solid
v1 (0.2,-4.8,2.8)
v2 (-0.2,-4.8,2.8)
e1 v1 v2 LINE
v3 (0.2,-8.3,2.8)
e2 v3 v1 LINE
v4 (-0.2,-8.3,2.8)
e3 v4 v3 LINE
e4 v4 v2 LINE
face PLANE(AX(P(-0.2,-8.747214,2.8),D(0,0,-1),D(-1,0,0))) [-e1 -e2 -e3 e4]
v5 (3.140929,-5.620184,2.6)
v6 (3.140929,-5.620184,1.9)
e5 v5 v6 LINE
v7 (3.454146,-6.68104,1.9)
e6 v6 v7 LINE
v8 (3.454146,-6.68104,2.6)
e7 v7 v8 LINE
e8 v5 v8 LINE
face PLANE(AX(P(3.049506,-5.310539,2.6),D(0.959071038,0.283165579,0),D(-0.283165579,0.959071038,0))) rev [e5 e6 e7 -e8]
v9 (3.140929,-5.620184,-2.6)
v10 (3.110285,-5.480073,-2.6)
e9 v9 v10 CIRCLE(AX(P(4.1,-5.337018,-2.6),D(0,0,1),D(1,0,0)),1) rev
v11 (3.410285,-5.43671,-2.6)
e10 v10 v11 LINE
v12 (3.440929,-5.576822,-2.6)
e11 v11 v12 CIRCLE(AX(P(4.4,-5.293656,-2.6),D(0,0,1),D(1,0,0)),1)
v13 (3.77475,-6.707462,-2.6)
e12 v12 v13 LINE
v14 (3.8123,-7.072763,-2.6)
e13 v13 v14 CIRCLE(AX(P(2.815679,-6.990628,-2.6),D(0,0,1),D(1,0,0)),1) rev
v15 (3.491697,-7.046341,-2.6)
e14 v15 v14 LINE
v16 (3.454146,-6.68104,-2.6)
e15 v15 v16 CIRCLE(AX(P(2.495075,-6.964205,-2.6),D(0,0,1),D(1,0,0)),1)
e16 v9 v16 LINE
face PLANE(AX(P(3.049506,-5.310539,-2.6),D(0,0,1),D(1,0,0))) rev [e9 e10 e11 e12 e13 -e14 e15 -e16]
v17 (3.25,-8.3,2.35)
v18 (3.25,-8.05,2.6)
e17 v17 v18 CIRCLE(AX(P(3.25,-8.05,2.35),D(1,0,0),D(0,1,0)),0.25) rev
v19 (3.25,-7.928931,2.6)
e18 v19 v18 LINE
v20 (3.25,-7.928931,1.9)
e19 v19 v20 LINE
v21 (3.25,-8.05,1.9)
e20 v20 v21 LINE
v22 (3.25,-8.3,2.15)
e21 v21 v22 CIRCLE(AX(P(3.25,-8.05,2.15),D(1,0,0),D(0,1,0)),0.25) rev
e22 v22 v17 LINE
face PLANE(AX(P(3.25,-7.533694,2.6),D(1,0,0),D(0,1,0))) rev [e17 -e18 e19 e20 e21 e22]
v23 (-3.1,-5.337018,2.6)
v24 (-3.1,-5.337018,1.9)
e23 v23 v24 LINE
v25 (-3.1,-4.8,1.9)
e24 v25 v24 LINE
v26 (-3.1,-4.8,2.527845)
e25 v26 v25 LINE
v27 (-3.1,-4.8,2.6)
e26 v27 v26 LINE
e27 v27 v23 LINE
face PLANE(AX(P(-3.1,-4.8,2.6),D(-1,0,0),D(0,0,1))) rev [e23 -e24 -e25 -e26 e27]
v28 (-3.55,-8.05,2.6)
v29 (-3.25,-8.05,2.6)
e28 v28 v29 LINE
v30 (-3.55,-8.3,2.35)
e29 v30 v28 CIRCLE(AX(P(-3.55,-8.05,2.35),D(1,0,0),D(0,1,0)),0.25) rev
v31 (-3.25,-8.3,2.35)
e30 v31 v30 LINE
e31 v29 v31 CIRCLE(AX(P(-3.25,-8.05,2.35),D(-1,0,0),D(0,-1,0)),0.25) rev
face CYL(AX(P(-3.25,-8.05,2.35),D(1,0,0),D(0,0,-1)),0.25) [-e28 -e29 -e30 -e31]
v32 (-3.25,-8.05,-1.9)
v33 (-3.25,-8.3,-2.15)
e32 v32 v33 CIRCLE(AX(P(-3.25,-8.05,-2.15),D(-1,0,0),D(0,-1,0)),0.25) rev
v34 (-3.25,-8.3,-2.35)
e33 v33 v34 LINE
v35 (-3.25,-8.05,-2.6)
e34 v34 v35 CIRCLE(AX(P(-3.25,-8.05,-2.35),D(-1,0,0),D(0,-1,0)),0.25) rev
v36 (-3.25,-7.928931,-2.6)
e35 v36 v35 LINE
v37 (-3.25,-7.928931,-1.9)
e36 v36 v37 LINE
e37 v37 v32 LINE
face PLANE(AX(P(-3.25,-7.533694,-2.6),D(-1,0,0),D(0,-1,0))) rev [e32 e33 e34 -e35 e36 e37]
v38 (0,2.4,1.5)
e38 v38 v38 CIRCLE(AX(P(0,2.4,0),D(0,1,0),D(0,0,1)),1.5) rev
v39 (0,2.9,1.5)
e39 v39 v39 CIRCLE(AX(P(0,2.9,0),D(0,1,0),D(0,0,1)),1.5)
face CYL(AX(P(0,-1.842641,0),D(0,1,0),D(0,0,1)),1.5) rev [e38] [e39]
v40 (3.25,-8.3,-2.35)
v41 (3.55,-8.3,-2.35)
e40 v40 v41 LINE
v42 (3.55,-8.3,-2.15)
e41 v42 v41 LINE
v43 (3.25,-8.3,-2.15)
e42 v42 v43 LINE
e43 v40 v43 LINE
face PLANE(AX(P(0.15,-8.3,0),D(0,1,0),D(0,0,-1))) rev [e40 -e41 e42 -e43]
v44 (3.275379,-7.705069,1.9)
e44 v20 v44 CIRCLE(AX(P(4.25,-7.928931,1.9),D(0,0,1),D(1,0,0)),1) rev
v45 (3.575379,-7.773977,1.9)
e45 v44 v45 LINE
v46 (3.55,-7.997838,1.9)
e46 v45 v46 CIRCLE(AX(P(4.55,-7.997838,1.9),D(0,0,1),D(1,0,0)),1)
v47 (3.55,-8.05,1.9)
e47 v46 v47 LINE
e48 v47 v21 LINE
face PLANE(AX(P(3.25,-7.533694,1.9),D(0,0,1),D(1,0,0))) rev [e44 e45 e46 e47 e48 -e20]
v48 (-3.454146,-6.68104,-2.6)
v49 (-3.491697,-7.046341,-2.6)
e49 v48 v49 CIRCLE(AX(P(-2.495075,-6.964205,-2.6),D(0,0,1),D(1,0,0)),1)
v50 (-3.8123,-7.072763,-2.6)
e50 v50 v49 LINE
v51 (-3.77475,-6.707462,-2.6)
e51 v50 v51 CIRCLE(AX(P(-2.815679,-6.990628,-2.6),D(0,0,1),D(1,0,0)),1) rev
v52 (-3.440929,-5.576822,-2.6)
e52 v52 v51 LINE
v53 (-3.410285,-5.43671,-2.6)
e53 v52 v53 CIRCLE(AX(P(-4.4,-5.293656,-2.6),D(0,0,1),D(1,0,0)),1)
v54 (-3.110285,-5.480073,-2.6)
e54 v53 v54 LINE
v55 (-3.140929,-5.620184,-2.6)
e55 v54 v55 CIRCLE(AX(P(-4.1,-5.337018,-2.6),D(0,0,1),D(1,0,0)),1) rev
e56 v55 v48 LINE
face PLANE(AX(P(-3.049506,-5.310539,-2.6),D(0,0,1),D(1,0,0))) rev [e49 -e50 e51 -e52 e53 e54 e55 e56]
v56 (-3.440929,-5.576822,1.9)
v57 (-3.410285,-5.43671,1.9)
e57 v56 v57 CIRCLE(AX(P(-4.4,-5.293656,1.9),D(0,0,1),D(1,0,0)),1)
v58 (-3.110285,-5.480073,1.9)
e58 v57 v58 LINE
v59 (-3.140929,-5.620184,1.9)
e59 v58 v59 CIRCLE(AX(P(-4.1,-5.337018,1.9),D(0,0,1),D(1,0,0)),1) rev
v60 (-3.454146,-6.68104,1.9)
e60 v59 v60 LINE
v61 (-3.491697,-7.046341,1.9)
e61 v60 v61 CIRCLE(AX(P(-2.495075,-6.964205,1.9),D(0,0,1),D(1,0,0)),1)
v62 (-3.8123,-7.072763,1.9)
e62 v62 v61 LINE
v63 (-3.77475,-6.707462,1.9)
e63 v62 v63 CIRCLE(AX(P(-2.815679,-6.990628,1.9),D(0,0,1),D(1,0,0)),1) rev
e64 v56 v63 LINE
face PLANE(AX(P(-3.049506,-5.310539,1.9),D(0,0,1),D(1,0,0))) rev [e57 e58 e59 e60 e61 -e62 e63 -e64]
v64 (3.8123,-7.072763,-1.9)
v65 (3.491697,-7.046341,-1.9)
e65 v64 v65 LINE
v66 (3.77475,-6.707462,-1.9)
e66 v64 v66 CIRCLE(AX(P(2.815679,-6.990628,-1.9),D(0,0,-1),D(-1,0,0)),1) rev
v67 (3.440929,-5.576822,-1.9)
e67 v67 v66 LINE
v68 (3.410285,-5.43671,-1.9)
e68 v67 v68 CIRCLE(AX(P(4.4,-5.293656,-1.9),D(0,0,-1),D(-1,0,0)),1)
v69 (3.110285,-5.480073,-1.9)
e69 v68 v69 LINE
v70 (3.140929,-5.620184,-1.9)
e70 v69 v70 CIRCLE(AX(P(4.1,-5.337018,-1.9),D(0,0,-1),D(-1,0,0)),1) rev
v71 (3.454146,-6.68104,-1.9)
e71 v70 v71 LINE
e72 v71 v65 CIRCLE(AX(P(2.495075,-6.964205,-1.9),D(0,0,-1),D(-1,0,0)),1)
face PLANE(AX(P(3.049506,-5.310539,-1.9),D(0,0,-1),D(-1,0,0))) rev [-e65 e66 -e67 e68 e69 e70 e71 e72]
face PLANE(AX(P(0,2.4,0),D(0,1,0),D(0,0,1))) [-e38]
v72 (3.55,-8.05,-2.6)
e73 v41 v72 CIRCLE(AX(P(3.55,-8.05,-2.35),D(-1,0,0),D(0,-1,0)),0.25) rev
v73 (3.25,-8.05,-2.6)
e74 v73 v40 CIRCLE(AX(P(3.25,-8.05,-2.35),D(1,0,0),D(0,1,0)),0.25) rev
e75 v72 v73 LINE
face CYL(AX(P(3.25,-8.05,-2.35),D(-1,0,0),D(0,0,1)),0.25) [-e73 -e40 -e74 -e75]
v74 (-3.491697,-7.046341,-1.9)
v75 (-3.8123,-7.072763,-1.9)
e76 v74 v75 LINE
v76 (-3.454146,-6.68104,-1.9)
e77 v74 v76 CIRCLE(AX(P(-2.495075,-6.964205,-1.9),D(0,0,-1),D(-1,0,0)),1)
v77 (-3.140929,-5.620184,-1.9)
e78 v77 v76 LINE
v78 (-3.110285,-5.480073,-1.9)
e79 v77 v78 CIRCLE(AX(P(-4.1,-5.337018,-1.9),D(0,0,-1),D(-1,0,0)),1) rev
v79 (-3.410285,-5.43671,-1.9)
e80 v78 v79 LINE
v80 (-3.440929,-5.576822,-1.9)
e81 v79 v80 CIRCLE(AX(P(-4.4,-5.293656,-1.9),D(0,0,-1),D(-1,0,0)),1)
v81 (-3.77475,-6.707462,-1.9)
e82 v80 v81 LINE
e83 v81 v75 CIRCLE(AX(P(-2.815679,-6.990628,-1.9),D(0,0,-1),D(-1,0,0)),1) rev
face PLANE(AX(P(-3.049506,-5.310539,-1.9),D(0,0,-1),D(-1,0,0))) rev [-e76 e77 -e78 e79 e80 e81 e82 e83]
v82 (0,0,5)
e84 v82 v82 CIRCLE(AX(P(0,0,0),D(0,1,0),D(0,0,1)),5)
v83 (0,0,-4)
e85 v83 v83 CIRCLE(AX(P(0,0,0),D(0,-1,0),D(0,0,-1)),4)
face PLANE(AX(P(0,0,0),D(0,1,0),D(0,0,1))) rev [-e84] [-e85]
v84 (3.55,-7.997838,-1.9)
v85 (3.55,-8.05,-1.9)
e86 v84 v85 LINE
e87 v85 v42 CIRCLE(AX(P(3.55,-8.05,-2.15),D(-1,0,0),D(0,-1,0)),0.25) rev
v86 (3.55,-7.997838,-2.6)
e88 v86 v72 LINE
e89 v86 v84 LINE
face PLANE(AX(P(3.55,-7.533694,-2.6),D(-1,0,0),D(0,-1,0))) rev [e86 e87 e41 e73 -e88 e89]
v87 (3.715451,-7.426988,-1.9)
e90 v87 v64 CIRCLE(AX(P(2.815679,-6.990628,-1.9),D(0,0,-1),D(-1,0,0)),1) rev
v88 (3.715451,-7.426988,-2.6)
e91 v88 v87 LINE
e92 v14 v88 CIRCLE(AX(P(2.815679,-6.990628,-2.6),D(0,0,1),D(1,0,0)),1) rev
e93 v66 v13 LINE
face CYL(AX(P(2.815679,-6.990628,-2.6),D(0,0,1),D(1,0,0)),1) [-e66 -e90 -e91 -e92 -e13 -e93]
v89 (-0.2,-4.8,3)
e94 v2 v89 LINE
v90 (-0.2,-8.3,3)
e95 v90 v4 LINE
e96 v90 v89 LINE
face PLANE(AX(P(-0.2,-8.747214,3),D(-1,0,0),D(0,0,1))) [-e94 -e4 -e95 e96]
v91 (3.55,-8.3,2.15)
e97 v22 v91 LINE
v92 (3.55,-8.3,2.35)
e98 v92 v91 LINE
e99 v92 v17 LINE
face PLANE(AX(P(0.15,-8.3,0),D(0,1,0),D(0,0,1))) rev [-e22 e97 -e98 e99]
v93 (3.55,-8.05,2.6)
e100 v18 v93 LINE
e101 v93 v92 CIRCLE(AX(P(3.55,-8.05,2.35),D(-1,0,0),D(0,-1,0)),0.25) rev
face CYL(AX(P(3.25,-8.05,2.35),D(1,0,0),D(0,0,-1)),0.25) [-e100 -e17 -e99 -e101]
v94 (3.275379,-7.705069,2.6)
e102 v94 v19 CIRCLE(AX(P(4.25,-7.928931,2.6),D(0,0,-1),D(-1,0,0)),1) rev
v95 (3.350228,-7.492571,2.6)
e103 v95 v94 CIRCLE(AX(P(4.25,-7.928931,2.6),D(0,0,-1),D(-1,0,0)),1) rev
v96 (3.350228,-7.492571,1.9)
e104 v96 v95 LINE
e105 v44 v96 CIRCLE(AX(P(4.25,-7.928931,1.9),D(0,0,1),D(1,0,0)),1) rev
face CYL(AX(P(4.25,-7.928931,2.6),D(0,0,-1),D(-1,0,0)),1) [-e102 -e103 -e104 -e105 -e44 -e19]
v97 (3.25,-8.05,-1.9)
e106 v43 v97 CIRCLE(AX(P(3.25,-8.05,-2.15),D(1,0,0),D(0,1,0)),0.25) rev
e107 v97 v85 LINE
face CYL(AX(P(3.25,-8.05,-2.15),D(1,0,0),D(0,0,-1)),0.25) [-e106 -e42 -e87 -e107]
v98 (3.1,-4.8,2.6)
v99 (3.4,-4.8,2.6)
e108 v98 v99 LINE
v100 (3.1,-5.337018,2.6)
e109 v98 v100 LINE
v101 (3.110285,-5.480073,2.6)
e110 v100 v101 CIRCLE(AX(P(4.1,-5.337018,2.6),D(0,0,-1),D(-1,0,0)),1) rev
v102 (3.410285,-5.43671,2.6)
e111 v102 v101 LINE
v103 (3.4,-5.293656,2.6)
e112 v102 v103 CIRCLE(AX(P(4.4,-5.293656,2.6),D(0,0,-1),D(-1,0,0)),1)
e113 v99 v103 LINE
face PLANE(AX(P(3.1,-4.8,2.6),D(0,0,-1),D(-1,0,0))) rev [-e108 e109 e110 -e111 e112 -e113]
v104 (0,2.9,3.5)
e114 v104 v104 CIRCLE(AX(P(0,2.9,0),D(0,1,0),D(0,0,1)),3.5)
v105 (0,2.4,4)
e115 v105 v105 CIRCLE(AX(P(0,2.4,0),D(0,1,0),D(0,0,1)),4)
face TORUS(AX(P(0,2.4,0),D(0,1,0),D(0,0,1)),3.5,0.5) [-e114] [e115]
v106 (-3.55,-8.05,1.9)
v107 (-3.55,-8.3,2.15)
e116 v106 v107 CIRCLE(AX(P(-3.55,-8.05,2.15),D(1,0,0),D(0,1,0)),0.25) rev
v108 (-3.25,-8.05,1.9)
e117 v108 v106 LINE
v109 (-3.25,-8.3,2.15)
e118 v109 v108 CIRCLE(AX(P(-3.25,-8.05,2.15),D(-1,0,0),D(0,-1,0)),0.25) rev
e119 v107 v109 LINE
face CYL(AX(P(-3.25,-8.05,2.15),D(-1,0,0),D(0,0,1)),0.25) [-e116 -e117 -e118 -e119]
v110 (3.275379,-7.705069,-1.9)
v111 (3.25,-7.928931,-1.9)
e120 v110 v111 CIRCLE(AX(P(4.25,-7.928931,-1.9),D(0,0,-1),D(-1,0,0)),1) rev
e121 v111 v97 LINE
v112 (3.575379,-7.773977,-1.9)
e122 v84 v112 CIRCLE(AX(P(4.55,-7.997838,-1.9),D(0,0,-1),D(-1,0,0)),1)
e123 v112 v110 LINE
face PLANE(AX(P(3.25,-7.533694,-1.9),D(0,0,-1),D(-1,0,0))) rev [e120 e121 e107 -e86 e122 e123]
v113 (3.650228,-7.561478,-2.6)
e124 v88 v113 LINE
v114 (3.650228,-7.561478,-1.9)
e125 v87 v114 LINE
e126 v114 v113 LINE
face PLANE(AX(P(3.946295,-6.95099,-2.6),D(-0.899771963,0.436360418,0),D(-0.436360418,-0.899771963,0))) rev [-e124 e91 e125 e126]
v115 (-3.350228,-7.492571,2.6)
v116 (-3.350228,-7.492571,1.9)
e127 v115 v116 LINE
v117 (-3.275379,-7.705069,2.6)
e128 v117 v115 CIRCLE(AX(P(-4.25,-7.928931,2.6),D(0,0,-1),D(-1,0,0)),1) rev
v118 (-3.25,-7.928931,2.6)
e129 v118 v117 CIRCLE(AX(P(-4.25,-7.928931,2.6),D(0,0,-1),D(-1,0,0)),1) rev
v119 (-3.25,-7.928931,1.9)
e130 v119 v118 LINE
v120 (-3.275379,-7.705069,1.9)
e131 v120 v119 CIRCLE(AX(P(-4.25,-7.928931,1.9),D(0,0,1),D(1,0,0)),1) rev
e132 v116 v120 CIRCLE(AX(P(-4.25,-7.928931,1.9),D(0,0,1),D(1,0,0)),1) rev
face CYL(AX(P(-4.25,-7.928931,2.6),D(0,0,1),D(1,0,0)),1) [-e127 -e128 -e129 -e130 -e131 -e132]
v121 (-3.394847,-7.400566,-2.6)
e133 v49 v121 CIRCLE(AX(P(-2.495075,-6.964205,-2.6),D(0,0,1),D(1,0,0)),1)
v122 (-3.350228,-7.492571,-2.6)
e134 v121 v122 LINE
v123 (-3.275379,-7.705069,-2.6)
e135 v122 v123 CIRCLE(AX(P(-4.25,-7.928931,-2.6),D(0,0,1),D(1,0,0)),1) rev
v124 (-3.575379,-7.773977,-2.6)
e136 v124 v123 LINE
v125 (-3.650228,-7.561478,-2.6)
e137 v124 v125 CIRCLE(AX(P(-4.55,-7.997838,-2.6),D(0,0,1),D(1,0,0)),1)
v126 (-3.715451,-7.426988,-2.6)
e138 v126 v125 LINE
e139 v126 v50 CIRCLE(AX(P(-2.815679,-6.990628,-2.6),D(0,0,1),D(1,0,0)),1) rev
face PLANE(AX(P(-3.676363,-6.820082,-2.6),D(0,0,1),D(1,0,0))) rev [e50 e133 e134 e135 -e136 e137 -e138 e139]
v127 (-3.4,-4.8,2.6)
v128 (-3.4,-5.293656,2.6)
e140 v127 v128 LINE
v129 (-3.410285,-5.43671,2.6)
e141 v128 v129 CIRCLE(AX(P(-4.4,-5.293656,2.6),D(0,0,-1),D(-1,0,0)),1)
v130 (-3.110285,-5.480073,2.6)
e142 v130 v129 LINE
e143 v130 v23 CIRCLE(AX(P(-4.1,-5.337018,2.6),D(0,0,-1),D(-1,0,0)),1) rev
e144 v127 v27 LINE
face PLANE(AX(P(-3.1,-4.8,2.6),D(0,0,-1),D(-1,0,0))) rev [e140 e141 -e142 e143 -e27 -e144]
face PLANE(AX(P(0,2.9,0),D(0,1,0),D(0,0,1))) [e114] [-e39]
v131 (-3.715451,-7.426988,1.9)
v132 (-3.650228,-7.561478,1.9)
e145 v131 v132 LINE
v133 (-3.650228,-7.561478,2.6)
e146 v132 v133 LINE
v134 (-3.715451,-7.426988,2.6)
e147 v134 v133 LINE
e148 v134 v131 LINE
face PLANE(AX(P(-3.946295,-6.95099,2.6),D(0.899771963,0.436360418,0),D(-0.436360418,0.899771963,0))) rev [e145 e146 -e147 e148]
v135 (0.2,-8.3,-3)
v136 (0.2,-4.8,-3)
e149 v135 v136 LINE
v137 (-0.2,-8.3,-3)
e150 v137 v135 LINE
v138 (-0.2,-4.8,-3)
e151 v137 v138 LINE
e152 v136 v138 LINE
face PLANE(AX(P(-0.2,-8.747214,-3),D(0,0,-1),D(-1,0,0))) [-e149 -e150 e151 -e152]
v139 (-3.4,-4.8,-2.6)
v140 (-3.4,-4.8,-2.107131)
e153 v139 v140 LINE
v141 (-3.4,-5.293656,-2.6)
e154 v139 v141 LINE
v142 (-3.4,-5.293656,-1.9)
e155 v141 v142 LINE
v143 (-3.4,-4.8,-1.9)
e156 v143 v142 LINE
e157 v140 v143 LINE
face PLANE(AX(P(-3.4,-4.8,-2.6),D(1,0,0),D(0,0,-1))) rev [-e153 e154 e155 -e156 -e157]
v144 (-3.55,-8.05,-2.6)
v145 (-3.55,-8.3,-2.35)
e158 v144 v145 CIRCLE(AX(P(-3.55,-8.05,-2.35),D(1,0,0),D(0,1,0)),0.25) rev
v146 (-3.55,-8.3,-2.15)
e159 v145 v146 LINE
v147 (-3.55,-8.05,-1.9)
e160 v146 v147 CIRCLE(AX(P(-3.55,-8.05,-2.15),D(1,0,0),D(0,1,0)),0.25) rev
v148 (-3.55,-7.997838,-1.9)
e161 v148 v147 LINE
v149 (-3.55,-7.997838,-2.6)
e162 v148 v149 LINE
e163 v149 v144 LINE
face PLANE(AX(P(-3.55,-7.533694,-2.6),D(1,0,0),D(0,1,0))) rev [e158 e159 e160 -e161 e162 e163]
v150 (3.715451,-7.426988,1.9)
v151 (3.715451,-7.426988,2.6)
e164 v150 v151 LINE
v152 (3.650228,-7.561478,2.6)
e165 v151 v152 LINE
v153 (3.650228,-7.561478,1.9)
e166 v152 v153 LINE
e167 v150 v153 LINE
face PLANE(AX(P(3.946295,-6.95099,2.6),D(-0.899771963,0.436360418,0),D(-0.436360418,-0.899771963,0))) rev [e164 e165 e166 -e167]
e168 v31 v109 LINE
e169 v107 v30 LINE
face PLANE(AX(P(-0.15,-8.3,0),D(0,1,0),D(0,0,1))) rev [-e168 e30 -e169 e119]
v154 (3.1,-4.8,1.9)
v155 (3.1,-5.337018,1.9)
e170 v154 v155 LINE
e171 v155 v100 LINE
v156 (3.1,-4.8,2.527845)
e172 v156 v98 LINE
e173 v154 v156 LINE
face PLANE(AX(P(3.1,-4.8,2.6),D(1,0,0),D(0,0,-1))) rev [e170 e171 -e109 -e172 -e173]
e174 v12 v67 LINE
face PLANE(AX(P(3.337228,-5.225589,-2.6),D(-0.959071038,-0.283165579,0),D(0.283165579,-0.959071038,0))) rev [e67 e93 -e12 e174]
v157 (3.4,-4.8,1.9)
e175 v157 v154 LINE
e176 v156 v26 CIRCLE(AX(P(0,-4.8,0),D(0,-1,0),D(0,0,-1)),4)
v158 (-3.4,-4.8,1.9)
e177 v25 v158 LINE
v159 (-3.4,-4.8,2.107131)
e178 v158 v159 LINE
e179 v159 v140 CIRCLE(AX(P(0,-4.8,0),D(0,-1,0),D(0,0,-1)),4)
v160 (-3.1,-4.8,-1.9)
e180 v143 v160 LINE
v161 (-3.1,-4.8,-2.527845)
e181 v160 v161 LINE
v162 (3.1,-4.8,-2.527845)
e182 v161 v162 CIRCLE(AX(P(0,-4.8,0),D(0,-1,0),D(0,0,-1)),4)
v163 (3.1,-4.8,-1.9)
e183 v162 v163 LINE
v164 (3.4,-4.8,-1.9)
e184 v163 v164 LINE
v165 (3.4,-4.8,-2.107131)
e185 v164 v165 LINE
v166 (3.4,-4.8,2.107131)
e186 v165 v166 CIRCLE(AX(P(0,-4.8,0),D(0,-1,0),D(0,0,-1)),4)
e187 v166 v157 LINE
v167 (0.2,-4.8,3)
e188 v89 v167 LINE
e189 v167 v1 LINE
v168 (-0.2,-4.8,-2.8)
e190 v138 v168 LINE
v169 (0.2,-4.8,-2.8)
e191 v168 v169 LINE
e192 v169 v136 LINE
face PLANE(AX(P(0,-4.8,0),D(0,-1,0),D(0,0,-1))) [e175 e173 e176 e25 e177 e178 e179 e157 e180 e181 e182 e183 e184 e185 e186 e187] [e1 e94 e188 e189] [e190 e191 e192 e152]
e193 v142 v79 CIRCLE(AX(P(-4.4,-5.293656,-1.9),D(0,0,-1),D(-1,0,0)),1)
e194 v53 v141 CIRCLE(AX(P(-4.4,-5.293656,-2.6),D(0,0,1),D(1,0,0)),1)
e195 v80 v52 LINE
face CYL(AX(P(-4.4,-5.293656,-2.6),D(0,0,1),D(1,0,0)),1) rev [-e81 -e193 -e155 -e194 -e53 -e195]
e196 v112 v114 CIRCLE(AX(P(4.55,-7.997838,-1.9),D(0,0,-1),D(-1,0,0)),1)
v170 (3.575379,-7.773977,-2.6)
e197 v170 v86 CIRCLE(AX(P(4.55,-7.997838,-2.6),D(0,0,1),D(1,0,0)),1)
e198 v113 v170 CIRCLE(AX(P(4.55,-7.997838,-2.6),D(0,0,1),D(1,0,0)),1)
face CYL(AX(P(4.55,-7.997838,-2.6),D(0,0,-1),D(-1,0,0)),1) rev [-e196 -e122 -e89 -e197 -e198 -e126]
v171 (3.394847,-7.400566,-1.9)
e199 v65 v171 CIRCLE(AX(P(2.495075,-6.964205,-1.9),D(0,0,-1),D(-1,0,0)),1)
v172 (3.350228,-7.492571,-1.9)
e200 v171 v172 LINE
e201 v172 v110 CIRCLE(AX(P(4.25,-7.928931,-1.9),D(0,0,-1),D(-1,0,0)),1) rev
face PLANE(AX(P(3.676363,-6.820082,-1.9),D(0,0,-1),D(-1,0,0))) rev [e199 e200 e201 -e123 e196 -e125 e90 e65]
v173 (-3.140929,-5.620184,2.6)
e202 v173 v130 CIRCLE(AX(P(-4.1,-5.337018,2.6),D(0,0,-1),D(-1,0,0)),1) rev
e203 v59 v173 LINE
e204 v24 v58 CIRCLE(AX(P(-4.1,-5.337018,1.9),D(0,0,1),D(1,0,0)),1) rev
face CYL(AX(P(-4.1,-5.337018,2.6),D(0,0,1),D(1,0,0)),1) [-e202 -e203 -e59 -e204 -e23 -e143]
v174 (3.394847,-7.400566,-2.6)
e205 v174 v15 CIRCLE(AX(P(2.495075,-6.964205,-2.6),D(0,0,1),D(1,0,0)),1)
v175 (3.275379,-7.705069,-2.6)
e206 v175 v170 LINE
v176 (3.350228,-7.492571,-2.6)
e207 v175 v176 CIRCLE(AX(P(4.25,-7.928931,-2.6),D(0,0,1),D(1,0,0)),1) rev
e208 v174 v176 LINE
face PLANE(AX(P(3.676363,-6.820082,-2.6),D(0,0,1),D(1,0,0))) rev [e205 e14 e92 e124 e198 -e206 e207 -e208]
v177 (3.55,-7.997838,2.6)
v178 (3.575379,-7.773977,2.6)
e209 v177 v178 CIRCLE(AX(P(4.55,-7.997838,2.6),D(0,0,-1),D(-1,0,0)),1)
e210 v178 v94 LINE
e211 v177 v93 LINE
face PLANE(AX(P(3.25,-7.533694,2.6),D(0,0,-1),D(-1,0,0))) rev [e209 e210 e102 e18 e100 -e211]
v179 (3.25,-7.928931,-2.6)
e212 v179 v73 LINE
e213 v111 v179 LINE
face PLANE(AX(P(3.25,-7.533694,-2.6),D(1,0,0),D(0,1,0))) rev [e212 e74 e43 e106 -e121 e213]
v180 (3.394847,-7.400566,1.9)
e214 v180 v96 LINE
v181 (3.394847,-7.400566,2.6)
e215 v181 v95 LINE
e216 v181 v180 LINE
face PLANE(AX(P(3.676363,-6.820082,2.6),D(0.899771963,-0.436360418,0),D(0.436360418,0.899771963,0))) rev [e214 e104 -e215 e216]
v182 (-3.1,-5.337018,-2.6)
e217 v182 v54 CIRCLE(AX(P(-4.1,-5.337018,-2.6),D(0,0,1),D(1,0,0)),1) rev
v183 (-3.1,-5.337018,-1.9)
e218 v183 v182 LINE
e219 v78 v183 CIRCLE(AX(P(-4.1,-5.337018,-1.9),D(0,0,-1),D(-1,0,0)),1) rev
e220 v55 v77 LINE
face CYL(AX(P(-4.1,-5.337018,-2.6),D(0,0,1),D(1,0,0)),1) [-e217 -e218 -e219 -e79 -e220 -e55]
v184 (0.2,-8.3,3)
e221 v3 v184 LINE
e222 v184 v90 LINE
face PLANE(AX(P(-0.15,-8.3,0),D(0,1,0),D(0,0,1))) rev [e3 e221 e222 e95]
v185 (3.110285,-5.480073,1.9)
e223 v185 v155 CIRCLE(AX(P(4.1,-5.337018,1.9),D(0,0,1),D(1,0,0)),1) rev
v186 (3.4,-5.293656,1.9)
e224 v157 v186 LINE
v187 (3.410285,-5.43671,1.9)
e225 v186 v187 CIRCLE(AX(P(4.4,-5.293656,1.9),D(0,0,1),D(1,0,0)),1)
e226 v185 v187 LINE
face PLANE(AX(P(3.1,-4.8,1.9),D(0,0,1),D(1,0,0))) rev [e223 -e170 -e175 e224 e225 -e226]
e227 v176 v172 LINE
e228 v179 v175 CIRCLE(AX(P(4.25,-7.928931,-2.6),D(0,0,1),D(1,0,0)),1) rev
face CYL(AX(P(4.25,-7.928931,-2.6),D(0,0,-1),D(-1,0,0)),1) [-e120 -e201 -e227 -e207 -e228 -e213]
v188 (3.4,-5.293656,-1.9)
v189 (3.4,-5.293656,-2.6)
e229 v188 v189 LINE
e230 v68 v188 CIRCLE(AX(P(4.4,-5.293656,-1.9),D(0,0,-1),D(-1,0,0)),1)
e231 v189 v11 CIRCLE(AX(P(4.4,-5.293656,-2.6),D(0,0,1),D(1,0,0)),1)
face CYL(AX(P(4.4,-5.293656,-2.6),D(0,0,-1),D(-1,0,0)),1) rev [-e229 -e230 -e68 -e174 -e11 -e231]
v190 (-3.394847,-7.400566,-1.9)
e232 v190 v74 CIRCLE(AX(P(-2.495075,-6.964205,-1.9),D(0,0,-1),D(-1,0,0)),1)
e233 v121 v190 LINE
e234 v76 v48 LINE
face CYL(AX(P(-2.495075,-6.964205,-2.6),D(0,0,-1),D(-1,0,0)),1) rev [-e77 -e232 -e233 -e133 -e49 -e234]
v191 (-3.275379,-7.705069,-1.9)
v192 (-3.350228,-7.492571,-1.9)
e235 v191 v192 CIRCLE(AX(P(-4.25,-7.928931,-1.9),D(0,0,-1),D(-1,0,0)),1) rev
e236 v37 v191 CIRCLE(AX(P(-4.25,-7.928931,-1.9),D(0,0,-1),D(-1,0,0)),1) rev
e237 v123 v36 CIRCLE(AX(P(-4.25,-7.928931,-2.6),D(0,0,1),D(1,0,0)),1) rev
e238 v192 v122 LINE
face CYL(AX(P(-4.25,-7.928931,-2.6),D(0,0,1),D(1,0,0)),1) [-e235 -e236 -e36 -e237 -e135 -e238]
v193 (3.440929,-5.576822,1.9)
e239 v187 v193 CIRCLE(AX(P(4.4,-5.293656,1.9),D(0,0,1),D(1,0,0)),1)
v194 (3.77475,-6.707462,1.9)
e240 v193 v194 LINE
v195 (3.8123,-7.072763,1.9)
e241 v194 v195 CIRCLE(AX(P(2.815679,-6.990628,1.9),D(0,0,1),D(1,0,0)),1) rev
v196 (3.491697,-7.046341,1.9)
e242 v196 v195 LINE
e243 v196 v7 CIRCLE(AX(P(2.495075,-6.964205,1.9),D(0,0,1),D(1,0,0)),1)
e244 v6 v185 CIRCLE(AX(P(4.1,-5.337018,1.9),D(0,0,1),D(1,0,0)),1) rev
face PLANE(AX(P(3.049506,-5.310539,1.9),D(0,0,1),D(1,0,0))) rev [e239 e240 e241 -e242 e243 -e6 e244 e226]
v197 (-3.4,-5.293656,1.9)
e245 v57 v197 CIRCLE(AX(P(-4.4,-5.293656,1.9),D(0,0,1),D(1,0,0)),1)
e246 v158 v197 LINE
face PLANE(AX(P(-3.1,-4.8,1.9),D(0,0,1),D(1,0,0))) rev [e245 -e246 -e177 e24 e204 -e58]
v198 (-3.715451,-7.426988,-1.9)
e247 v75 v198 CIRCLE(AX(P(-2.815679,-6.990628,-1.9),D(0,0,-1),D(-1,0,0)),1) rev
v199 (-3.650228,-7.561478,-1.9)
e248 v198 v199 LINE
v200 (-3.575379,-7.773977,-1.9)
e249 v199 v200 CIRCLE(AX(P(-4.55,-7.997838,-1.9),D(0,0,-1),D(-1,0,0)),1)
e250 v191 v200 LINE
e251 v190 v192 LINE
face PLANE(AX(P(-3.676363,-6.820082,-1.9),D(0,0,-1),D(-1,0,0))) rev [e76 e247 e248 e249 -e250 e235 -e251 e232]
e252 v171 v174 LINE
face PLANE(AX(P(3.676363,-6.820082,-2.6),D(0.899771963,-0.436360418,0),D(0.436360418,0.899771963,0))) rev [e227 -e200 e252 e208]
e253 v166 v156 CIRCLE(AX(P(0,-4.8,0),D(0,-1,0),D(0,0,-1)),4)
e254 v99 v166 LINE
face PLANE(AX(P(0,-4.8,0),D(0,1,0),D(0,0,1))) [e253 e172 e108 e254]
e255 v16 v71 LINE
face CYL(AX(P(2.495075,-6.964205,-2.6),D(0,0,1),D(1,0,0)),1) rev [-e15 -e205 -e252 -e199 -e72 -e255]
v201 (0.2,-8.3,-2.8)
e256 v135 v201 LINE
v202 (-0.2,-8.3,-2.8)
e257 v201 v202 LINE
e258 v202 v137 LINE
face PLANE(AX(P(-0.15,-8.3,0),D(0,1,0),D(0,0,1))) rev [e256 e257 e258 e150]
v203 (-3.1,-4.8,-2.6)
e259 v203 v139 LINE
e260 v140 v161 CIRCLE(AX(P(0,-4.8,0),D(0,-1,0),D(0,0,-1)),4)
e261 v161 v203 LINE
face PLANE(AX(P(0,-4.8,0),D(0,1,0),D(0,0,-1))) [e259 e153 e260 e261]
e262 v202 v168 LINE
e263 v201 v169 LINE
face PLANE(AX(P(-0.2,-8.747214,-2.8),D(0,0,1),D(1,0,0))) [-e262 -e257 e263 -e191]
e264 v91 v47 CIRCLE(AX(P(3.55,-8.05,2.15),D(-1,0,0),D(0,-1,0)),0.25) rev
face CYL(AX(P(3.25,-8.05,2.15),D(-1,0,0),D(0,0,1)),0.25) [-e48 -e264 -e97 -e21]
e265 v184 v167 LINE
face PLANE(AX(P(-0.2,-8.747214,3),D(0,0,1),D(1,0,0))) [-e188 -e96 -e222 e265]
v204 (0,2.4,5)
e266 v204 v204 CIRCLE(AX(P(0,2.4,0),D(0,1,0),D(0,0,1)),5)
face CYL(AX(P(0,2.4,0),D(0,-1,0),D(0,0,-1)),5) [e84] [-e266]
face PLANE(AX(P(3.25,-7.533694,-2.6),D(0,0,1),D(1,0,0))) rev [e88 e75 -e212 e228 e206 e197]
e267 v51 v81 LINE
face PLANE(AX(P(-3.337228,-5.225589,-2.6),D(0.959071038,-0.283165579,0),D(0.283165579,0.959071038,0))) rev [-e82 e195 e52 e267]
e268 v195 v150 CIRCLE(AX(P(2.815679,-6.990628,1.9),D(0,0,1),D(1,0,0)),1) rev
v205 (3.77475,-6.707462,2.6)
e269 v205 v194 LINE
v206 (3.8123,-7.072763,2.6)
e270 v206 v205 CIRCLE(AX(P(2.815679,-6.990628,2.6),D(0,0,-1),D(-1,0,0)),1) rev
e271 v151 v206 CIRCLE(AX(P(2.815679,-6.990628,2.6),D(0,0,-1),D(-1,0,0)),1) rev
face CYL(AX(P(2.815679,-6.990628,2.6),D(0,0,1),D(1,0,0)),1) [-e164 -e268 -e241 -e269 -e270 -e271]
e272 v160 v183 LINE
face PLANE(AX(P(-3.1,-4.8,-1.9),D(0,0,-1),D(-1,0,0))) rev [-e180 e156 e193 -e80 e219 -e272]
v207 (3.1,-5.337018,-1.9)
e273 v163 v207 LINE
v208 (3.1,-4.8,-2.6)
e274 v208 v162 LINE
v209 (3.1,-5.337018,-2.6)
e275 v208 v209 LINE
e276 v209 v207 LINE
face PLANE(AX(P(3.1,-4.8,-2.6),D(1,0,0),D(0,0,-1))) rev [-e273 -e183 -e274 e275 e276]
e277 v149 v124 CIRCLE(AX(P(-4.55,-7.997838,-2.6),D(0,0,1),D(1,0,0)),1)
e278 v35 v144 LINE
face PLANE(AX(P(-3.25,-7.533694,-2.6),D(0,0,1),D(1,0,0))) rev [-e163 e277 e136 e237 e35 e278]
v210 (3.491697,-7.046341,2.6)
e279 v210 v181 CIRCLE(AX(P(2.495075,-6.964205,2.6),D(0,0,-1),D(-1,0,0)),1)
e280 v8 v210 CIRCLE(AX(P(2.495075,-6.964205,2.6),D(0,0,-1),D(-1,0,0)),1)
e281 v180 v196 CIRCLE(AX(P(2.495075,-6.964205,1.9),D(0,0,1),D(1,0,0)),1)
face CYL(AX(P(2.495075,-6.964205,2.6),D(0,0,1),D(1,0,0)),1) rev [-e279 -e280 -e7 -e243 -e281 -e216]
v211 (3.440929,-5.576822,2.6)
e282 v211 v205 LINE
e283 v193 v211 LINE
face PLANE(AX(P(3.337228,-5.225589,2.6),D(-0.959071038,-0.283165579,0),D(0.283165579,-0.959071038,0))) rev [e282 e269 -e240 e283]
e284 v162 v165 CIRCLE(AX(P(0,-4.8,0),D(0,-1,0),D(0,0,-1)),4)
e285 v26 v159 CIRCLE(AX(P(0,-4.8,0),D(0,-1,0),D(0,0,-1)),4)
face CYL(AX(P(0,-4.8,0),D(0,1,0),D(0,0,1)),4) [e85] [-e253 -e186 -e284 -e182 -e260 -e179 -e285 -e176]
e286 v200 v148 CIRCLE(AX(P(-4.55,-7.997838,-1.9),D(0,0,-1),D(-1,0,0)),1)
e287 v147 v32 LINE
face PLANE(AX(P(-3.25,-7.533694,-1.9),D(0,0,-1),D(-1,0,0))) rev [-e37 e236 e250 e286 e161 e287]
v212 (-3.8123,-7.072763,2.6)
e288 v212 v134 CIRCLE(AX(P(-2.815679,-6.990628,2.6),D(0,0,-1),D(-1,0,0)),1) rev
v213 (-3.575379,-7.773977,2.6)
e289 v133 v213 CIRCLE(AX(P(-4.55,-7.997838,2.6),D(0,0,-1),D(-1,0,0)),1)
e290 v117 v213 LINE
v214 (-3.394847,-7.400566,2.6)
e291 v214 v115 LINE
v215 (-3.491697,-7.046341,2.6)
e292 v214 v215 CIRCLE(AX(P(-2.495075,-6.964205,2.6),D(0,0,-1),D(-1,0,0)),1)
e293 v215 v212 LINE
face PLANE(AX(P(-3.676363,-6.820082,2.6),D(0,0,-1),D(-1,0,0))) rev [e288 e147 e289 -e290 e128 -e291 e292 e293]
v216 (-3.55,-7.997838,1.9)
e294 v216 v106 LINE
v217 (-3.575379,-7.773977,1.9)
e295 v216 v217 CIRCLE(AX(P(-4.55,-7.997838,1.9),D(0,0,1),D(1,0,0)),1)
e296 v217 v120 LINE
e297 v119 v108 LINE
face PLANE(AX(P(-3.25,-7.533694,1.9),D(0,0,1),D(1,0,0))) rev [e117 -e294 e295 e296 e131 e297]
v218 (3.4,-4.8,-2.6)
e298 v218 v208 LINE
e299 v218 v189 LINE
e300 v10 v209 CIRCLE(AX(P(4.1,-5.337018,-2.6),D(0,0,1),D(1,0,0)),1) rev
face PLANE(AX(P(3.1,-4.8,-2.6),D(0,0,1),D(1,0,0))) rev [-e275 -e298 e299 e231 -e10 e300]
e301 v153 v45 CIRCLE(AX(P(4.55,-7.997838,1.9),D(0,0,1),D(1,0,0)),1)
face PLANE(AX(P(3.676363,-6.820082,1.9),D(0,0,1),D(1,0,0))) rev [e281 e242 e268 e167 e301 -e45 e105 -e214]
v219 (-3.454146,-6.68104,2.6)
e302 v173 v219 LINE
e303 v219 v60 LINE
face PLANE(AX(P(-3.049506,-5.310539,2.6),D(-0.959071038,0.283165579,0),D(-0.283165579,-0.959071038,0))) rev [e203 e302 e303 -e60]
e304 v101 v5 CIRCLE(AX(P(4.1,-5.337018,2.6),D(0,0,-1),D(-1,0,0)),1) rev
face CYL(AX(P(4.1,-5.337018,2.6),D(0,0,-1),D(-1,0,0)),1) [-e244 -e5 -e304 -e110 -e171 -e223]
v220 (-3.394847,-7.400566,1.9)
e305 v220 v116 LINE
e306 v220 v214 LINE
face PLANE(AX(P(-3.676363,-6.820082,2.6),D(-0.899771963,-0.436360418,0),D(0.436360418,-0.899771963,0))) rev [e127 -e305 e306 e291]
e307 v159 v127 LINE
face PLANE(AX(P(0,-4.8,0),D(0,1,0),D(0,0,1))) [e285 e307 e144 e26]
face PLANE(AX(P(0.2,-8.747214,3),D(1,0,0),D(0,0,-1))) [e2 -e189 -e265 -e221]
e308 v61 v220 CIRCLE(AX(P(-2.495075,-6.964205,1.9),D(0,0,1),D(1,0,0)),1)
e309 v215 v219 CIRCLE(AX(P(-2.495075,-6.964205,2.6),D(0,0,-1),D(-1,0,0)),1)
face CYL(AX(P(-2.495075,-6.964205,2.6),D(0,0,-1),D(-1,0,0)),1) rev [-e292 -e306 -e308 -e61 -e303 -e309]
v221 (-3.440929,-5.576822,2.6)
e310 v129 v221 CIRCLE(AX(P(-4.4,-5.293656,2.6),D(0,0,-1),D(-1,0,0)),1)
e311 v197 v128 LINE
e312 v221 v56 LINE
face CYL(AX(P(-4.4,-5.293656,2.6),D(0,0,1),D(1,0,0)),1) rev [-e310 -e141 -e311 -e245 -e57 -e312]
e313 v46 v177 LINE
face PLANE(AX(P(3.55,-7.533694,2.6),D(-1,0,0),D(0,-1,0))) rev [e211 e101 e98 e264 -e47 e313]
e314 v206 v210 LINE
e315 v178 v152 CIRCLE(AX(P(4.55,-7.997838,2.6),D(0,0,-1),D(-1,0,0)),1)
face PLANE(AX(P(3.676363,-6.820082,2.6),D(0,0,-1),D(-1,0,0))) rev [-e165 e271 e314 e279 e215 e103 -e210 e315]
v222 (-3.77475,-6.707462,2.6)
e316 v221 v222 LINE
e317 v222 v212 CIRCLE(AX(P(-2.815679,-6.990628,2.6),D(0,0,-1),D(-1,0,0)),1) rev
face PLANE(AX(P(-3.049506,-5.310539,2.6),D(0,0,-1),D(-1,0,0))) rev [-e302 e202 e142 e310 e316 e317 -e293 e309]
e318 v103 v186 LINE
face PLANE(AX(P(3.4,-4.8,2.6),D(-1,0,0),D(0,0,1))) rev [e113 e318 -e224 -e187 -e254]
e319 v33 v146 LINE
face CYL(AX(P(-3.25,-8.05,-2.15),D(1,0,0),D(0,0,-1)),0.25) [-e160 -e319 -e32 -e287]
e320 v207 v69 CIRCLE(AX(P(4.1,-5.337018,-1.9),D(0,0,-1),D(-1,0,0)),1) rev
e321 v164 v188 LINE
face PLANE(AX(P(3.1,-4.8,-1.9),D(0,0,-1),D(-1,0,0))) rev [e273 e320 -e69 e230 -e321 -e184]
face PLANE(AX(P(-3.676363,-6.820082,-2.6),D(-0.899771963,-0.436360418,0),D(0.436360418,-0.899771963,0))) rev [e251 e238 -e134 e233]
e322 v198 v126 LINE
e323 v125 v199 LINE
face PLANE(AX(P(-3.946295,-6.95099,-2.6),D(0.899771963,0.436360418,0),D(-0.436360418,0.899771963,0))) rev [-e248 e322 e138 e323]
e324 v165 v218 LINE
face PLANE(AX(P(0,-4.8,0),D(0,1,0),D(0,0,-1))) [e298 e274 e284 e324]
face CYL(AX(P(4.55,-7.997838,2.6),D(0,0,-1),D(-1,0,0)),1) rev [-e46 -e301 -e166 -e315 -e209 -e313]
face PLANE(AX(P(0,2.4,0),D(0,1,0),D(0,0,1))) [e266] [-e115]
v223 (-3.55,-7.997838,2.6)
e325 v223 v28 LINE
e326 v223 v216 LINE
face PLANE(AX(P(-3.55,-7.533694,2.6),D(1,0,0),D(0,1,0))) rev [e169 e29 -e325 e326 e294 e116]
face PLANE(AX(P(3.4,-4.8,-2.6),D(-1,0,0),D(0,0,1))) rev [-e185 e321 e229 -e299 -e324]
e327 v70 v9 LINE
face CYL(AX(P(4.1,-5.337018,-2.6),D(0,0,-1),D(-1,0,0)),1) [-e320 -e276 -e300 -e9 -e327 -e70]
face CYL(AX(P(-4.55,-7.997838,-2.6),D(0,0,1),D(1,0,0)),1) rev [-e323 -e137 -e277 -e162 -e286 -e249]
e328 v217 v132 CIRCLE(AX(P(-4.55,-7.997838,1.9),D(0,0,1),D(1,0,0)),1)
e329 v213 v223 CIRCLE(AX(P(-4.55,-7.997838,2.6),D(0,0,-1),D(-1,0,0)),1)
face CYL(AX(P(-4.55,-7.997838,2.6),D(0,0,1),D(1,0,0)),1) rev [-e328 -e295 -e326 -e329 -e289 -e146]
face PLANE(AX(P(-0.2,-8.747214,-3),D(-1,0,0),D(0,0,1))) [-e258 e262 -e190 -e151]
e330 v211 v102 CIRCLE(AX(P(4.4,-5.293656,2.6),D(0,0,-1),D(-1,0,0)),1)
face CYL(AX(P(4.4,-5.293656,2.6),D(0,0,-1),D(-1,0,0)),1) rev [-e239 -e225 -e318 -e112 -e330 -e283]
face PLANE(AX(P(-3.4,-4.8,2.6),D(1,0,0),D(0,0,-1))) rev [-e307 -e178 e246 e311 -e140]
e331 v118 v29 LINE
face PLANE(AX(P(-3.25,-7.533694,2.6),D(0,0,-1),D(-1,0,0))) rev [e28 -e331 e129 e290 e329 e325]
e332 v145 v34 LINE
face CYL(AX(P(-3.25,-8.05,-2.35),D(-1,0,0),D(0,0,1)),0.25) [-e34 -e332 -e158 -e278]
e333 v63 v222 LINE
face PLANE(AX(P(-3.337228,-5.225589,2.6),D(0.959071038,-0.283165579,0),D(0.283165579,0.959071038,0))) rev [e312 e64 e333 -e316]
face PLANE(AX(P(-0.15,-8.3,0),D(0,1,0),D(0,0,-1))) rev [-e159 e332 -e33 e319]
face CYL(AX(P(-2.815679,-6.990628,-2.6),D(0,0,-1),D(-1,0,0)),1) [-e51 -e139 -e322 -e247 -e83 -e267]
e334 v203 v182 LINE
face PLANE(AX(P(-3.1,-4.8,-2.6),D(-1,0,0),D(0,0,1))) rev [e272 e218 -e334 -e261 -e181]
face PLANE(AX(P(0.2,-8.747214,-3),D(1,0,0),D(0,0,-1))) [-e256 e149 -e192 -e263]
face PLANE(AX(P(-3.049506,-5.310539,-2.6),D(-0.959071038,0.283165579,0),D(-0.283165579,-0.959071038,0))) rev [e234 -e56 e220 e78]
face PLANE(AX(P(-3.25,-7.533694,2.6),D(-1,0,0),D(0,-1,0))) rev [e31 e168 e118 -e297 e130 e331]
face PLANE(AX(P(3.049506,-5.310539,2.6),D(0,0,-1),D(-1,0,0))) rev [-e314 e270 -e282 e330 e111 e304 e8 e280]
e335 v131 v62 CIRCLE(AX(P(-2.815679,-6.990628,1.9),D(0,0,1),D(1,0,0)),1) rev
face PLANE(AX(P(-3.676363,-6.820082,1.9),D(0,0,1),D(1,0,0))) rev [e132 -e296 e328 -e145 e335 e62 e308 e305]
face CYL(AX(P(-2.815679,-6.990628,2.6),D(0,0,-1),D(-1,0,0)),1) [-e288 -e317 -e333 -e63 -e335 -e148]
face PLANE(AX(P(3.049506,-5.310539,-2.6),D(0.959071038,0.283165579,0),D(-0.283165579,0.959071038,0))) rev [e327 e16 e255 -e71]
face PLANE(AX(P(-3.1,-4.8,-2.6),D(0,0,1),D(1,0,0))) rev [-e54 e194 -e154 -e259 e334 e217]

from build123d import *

# Parameters (mm, degrees)
SKETCH_1_R             = 5
EXTRUDE_1_DEPTH        = 2.4
SKETCH_2_R             = 4
EXTRUDE_2_DEPTH        = 4.8
EXTRUDE_START          = 0.5
SKETCH_3_R             = 4
EXTRUDE_3_DEPTH        = 0.5
FILLET_1_R             = 0.5
SKETCH_5_R             = 1.5
CUT_EXTRUDE_1_DEPTH    = 0.5
SKETCH_6_W             = 0.3
SKETCH_6_H             = 0.7
SKETCH_8_W             = 0.4
SKETCH_8_H             = 0.2
EXTRUDE_5_DEPTH        = 3.5
FILLET_2_R             = 1
FILLET_3_R             = 0.25
FILLET_2_OF_MIRROR_2_R = 1
FILLET_3_OF_MIRROR_2_R = 0.25


# Read off the part's stored shape, not the designer's step: Зеркальное отражение3
with BuildPart() as part:
    # Эскиз1 → Бобышка-Вытянуть1 (new body)
    with BuildSketch(Plane(origin=(0, 0, 0), x_dir=(1, 0, 0), z_dir=(0, 1, 0))):
        with Locations(Location((0, 0, 0), (0, 0, 270))):
            Circle(SKETCH_1_R)
    extrude(amount=EXTRUDE_1_DEPTH)

    # Эскиз2 → Бобышка-Вытянуть2 (add)
    with BuildSketch(Plane.XZ):
        with Locations(Location((0, 0, 0), (0, 0, 270))):
            Circle(SKETCH_2_R)
    extrude(amount=EXTRUDE_2_DEPTH)

    # Эскиз3 → Бобышка-Вытянуть3 (add)
    with BuildSketch(Plane(origin=(0, 2.4, 0), x_dir=(1, 0, 0), z_dir=(0, 1, 0)).offset(EXTRUDE_START)):
        with Locations(Location((0, 0, 0), (0, 0, 90))):
            Circle(SKETCH_3_R)
    extrude(amount=-EXTRUDE_3_DEPTH)

    # Скругление1
    fillet_1_edges = [part.edges().sort_by_distance(p)[0] for p in [
        (0, 2.9, 4),
    ]]
    fillet(fillet_1_edges, radius=FILLET_1_R - 0.0001)  # a hair under: the kernel refuses the full size

    # Эскиз5 → Вырез-Вытянуть1 (cut)
    with BuildSketch(Plane(origin=(0, 2.9, 0), x_dir=(1, 0, 0), z_dir=(0, 1, 0))):
        with Locations(Location((0, 0, 0), (0, 0, 270))):
            Circle(SKETCH_5_R)
    extrude(amount=-CUT_EXTRUDE_1_DEPTH, mode=Mode.SUBTRACT)

    # По траектории4: sweep along a curve in space
    with BuildLine() as sweep_4_path:
        Line((-3.25, -4.8, 2.25), (-3.25, -5.459878122, 2.25))
        Line((-3.25, -5.459878122, 2.25), (-3.724056905, -7.065490817, 2.25))
        Line((-3.724056905, -7.065490817, 2.25), (-3.4, -7.733693766, 2.25))
        Line((-3.4, -7.733693766, 2.25), (-3.4, -8.3, 2.25))
    # Эскиз6 → По траектории4 (sweep)
    with BuildSketch(Plane(origin=(0, -4.8, -4.8), x_dir=(-1, 0, 0), z_dir=(0, 1, 0))):
        with Locations((3.25, 7.05)):
            Rectangle(SKETCH_6_W, SKETCH_6_H)
    sweep_4 = sweep(path=sweep_4_path.line, transition=Transition.RIGHT)

    # Эскиз8 → Бобышка-Вытянуть5 (add)
    with BuildSketch(Plane(origin=(0, -4.8, 9.6), x_dir=(1, 0, 0), z_dir=(0, 1, 0))):
        with Locations((0, 12.5)):
            Rectangle(SKETCH_8_W, SKETCH_8_H)
        with Locations((0, 6.7)):
            Rectangle(SKETCH_8_W, SKETCH_8_H)
    extrude(amount=-EXTRUDE_5_DEPTH)

    # Скругление2
    fillet_2_edges = [part.edges().sort_by_distance(p)[0] for p in [
        (-3.25, -7.699240124, 2.25),
        (-3.55, -7.768147407, 2.25),
        (-3.884358836, -7.078701954, 2.25),
        (-3.563754975, -7.052279681, 2.25),
        (-3.4, -5.438197011, 2.25),
        (-3.1, -5.481559233, 2.25),
    ]]
    fillet(fillet_2_edges, radius=FILLET_2_R)

    # Скругление3
    fillet_3_edges = [part.edges().sort_by_distance(p)[0] for p in [
        (-3.4, -8.3, 1.9),
        (-3.4, -8.3, 2.6),
    ]]
    fillet(fillet_3_edges, radius=FILLET_3_R)

    # Зеркальное отражение2: По траектории4 across plane
    add(sweep_4.mirror(Plane(origin=(0, 0, 0), x_dir=(0, 0, 1), z_dir=(1, 0, 0))))

    # Скругление2 of Зеркальное отражение2
    fillet_2_of_mirror_2_edges = [part.edges().sort_by_distance(p)[0] for p in [
        (3.25, -7.699240124, 2.25),
        (3.55, -7.768147407, 2.25),
        (3.884358836, -7.078701954, 2.25),
        (3.563754975, -7.052279681, 2.25),
        (3.4, -5.438197011, 2.25),
        (3.1, -5.481559233, 2.25),
    ]]
    fillet(fillet_2_of_mirror_2_edges, radius=FILLET_2_OF_MIRROR_2_R)

    # Скругление3 of Зеркальное отражение2
    fillet_3_of_mirror_2_edges = [part.edges().sort_by_distance(p)[0] for p in [
        (3.4, -8.3, 1.9),
        (3.4, -8.3, 2.6),
    ]]
    fillet(fillet_3_of_mirror_2_edges, radius=FILLET_3_OF_MIRROR_2_R)

    # Зеркальное отражение3: part across plane


with BuildPart() as part_1:
    add(part.part)
    add(part.part.mirror(Plane.XY))


solid = part_1.part
